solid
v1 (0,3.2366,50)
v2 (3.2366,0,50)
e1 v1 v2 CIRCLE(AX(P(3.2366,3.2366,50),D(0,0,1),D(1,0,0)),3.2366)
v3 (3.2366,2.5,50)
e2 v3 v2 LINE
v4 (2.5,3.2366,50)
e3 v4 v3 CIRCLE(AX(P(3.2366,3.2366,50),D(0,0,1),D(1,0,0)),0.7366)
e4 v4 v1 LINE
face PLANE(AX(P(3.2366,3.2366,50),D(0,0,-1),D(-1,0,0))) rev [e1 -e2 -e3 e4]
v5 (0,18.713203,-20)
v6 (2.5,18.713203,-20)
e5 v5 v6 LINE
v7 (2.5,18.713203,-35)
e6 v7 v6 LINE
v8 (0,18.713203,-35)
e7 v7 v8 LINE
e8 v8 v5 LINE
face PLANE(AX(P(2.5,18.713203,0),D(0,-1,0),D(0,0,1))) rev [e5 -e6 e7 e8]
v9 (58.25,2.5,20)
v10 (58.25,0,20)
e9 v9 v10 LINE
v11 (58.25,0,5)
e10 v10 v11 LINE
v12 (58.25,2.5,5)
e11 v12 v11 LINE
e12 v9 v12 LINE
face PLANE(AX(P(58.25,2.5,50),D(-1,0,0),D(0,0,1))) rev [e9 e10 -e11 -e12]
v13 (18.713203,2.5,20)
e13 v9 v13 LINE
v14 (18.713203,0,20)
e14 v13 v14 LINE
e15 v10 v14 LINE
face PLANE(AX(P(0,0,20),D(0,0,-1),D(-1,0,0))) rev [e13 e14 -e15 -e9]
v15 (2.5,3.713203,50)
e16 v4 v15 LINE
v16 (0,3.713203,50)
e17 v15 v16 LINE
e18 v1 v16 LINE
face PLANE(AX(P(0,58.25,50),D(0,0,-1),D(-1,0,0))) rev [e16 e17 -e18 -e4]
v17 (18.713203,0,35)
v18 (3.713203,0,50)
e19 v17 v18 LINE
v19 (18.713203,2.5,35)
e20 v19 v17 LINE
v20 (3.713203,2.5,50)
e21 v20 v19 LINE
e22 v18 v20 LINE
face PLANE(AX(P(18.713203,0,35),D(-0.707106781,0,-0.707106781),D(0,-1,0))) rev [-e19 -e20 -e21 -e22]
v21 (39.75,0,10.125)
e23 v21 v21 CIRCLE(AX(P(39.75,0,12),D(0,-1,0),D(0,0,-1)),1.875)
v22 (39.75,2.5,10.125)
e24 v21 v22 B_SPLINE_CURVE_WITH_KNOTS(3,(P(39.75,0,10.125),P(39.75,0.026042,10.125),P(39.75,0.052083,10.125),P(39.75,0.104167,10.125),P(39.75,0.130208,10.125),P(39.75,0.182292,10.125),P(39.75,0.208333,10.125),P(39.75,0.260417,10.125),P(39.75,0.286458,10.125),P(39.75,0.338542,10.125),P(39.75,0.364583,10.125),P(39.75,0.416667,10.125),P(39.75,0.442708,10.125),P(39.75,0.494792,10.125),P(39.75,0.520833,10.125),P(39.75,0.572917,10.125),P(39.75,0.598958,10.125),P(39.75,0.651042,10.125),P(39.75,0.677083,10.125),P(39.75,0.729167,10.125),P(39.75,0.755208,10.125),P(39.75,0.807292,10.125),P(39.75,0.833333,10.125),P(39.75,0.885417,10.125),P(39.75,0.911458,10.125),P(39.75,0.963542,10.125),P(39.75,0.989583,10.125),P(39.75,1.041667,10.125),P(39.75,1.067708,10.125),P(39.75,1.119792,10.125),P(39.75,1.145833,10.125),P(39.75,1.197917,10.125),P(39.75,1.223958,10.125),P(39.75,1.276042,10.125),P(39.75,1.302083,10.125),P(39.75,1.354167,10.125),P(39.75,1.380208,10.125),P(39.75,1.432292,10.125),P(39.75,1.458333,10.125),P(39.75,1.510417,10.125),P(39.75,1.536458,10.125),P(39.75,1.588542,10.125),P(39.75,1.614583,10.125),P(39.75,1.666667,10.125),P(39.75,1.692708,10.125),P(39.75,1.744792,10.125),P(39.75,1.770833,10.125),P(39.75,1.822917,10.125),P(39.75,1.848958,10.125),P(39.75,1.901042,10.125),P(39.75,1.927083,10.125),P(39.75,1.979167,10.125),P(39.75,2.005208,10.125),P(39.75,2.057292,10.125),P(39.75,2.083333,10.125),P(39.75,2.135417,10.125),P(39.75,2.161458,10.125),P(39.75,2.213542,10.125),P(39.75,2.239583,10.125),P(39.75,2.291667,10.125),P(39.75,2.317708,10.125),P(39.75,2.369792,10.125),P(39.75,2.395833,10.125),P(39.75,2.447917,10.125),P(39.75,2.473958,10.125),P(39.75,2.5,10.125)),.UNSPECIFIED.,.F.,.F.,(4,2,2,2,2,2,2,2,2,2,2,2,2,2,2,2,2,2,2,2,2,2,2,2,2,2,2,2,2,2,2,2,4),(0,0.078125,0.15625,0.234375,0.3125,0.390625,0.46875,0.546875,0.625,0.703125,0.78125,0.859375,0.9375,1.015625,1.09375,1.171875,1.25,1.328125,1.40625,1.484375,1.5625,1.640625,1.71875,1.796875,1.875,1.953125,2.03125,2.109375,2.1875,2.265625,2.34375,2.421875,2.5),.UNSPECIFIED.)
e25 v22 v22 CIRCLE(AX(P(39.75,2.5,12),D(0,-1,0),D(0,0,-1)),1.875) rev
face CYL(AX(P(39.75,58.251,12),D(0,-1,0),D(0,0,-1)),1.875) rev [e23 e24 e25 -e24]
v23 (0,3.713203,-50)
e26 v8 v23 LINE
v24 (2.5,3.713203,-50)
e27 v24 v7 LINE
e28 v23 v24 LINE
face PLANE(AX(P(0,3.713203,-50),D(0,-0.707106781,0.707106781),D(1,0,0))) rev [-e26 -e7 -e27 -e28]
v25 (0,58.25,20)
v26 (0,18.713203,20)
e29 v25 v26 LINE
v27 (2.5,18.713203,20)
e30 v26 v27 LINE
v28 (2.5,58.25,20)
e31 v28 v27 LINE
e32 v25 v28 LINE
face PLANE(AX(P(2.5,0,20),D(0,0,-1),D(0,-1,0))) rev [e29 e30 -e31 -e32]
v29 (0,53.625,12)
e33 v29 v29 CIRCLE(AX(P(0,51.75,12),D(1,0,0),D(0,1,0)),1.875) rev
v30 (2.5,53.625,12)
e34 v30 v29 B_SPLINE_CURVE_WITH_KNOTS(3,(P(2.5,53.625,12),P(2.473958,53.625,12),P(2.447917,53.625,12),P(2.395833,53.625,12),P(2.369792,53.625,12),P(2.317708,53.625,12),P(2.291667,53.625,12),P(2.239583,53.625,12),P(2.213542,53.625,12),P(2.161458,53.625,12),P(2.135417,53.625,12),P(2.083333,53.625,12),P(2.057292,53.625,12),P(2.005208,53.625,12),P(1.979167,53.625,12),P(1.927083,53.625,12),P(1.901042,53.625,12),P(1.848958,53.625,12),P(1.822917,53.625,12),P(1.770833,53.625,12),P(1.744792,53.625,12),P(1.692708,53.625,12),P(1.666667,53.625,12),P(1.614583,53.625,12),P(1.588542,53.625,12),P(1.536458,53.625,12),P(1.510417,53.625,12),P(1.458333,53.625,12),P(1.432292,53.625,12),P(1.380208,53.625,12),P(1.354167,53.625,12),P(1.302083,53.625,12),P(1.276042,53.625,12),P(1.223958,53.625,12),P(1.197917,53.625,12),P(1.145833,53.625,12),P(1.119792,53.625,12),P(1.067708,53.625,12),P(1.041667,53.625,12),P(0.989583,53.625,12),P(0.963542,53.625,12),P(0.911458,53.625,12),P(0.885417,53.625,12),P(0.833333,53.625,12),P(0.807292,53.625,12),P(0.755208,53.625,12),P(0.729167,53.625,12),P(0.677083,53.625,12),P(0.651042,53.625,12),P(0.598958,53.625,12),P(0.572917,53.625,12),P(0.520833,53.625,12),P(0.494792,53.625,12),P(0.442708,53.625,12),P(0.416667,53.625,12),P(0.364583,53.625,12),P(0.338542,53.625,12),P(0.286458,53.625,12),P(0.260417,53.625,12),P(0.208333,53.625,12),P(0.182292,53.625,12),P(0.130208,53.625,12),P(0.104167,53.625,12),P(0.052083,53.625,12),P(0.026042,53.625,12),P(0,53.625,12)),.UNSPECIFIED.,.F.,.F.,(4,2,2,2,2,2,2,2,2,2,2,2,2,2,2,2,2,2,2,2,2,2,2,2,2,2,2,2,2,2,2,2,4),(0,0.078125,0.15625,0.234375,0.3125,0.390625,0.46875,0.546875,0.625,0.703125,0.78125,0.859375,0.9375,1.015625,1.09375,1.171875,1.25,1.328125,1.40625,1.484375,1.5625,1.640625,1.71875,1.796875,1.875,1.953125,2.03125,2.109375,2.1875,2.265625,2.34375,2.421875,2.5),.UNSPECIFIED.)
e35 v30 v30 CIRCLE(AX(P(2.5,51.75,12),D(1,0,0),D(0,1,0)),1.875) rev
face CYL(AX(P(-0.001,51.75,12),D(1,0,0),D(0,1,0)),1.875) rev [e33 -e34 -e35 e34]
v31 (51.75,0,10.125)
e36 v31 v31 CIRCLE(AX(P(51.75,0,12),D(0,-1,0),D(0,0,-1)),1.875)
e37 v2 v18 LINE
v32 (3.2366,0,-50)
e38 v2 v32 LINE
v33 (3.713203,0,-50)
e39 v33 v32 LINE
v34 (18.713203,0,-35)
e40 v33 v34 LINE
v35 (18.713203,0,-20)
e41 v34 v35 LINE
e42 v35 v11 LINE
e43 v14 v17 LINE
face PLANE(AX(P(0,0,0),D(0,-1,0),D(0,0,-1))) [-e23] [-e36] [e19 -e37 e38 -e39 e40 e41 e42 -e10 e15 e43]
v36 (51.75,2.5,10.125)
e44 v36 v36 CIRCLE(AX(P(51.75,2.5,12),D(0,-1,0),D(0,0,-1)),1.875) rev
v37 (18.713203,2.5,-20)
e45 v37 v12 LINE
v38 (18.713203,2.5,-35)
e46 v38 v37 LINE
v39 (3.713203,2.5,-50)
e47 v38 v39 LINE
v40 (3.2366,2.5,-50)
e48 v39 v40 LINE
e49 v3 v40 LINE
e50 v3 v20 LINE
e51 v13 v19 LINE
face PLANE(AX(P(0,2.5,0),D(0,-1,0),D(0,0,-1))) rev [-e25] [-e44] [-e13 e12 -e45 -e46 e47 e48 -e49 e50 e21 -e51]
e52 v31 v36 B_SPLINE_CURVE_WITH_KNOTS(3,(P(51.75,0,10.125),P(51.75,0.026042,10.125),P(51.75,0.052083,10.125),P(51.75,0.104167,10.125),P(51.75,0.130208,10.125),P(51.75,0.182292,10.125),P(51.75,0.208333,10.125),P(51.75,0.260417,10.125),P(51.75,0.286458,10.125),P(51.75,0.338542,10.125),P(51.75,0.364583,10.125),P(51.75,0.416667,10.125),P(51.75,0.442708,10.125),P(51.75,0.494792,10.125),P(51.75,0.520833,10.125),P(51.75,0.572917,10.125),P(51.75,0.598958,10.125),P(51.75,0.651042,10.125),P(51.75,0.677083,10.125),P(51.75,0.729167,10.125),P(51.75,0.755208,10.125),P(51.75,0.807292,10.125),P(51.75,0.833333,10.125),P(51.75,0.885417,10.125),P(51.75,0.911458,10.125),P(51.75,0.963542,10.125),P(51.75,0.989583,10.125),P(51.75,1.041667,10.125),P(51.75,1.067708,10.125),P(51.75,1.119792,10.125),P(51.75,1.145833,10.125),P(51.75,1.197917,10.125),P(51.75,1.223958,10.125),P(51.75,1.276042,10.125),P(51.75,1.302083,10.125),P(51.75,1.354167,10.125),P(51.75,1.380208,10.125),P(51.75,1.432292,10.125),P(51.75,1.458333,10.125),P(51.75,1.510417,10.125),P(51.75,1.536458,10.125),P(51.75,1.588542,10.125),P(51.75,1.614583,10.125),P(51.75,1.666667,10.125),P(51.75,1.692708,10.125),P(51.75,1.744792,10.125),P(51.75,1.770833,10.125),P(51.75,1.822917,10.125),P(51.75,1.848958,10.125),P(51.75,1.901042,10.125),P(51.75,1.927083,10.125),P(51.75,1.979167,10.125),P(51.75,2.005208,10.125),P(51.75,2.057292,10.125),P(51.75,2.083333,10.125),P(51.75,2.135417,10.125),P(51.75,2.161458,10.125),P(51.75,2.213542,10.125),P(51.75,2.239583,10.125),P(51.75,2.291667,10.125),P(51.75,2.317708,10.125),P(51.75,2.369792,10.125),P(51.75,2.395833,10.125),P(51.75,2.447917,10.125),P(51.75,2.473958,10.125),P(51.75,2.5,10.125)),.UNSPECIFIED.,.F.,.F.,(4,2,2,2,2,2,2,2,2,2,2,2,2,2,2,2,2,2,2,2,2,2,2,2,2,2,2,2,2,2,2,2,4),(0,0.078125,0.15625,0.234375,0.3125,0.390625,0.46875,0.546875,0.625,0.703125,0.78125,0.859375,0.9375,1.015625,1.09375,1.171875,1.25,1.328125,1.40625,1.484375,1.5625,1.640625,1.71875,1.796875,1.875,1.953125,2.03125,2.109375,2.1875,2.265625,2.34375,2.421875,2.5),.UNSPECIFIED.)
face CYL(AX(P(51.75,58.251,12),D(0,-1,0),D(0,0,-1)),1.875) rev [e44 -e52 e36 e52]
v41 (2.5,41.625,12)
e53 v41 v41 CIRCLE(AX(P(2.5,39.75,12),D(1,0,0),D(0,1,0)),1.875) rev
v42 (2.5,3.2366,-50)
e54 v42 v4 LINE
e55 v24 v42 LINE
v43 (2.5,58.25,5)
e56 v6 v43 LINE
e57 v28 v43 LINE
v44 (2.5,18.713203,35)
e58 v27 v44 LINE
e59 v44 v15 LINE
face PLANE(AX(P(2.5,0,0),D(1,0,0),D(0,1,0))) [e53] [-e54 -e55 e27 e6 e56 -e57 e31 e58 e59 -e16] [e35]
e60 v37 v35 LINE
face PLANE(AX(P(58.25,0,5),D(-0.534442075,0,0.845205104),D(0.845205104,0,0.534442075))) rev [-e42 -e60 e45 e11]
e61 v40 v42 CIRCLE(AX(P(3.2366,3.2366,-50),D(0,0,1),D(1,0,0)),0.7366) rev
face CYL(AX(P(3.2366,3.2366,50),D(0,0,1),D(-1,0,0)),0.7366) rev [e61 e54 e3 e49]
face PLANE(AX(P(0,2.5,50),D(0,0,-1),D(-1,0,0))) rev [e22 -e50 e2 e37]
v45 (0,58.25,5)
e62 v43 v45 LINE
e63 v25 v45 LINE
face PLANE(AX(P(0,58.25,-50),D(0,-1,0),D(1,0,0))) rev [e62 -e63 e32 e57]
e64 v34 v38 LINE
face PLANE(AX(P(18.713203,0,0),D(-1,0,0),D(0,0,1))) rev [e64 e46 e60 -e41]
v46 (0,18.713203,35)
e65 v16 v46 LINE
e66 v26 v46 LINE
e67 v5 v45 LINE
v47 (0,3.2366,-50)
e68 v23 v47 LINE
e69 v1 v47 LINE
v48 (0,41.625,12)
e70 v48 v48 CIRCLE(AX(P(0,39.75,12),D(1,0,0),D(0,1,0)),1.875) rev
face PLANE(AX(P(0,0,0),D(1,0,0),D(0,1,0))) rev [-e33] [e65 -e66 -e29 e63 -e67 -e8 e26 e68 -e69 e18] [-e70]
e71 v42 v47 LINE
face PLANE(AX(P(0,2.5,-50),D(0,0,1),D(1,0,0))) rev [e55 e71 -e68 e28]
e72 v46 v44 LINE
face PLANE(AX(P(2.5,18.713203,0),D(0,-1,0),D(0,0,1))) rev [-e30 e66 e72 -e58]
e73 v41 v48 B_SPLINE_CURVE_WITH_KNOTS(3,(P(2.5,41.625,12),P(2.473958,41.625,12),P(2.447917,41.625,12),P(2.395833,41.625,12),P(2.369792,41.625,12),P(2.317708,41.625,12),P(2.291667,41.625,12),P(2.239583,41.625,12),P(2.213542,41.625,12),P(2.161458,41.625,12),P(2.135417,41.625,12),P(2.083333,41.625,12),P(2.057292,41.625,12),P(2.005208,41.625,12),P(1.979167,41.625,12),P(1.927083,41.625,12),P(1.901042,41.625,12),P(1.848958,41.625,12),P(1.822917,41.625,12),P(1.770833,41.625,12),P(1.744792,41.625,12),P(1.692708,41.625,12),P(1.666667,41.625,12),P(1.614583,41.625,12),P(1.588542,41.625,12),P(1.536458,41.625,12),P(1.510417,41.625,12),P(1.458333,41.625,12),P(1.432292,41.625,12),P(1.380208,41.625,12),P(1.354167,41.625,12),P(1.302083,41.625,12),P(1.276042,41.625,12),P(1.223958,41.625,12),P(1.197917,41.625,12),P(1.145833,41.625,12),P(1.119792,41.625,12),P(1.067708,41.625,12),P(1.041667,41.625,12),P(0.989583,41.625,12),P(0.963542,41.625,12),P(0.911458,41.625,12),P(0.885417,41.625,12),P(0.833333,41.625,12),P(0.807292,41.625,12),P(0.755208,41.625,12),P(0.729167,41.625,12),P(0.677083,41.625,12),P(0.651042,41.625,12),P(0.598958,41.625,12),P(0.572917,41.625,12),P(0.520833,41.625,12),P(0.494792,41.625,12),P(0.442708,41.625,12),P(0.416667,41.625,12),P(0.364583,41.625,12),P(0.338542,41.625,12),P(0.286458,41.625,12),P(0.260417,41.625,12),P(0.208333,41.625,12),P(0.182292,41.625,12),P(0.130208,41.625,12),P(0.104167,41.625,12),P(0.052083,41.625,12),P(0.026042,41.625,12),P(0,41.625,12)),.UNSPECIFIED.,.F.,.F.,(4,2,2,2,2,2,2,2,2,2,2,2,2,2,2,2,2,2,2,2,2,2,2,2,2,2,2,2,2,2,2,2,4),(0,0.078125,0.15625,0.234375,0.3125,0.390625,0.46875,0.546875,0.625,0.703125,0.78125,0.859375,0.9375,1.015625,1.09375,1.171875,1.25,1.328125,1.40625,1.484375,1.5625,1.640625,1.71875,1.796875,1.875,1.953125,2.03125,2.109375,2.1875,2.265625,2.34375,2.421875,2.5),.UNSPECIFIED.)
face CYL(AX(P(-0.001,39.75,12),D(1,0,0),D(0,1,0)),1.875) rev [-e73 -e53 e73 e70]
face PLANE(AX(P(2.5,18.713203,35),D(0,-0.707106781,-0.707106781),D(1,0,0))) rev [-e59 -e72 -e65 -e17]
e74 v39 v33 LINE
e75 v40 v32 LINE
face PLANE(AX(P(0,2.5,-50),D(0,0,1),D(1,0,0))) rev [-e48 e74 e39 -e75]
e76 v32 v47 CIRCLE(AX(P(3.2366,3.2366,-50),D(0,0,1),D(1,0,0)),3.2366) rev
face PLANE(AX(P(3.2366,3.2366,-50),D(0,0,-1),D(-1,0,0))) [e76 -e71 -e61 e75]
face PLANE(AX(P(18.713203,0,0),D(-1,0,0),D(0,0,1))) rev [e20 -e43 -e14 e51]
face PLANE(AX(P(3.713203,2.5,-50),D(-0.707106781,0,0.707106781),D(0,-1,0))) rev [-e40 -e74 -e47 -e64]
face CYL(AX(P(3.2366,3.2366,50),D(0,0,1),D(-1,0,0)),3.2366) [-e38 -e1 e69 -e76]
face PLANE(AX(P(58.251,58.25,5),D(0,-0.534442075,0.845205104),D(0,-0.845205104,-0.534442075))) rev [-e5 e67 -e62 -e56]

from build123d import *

# Parameters (mm, degrees)
SKETCH1_W                    = 58.25
SKETCH1_H                    = 100
BASE_FLANGE1_DEPTH           = 2.5
EDGE_FLANGE1_STRIP_W         = 11.4732
EDGE_FLANGE1_STRIP_H         = 2.5
EDGE_FLANGE1_STRIP_CUT_DEPTH = 100
EDGE_FLANGE1_DEPTH           = 100
CUT_EXTRUDE1_START           = -30
CUT_EXTRUDE1_OUTLINE_W       = 2.5
CUT_EXTRUDE1_OUTLINE_H       = 39.536796564
CUT_EXTRUDE1_OUTLINE_W_2     = 39.536796564
CUT_EXTRUDE1_OUTLINE_H_2     = 2.5
CUT_EXTRUDE1_DEPTH           = 30
CUT_EXTRUDE2_REACH           = 98.365
SKETCH21_R                   = 1.875
CIRPATTERN1_COUNT            = 2
CIRPATTERN1_ANGLE            = 90
CUT_EXTRUDE3_REACH           = 98.365
CIRPATTERN2_COUNT            = 2
CIRPATTERN2_ANGLE            = 90
CHAMFER1_SIZE                = 15


# Read off the part's stored shape, not the designer's step: Cut-Extrude1
# Sheet-metal steps are written as plain solids
with BuildPart() as part:
    # Sketch1 → Base-Flange1 (new body)
    with BuildSketch(Plane(origin=(0, 0, 0), x_dir=(1, 0, 0), z_dir=(0, 1, 0))):
        with Locations((29.125, 0)):
            Rectangle(SKETCH1_W, SKETCH1_H)
    extrude(amount=BASE_FLANGE1_DEPTH)

    # Edge-Flange1 strip (across the edge) → Edge-Flange1 strip cut (cut)
    with BuildSketch(Plane(origin=(0, 2.5, -50), x_dir=(1, 0, 0), z_dir=(0, 0, 1))):
        with Locations((-2.5, -1.25)):
            Rectangle(EDGE_FLANGE1_STRIP_W, EDGE_FLANGE1_STRIP_H)
    extrude(amount=EDGE_FLANGE1_STRIP_CUT_DEPTH, mode=Mode.SUBTRACT)

    # Edge-Flange1 section (across the edge) → Edge-Flange1 (add)
    with BuildSketch(Plane(origin=(0, 2.5, -50), x_dir=(1, 0, 0), z_dir=(0, 0, 1))):
        with BuildLine():
            Line((0, 0.7366), (0, 55.75))
            Line((0, 55.75), (2.5, 55.75))
            Line((2.5, 55.75), (2.5, 0.7366))
            ThreePointArc((2.5, 0.7366), (2.715745145, 0.215745145), (3.2366, 0))
            Line((3.2366, 0), (3.2366, -2.5))
            ThreePointArc((3.2366, -2.5), (0.947978192, -1.552021808), (0, 0.7366))
        make_face()
    extrude(amount=EDGE_FLANGE1_DEPTH)

    # Cut-Extrude1 outline → Cut-Extrude1 (cut)
    with BuildSketch(Plane.XY.offset(50).offset(CUT_EXTRUDE1_START)):
        with Locations((1.25, 38.481601718)):
            Rectangle(CUT_EXTRUDE1_OUTLINE_W, CUT_EXTRUDE1_OUTLINE_H)
        with Locations((38.481601718, 1.25)):
            Rectangle(CUT_EXTRUDE1_OUTLINE_W_2, CUT_EXTRUDE1_OUTLINE_H_2)
    cut_extrude1 = extrude(amount=CUT_EXTRUDE1_DEPTH, mode=Mode.SUBTRACT)

    # Sketch21 → Cut-Extrude2 (cut, up to next)
    with BuildSketch(Plane.XZ, mode=Mode.PRIVATE) as cut_extrude2_sk1:
        with Locations(Location((51.75, 12, 0), (0, 0, 270))):
            Circle(SKETCH21_R)
    cut_extrude2_tool1 = extrude(cut_extrude2_sk1.sketch, amount=-CUT_EXTRUDE2_REACH, mode=Mode.PRIVATE) & part.part
    # Sketch21 → Cut-Extrude2 (cut, up to next)
    with BuildSketch(Plane.XZ, mode=Mode.PRIVATE) as cut_extrude2_sk2:
        with Locations(Location((39.75, 12, 0), (0, 0, 270))):
            Circle(SKETCH21_R)
    cut_extrude2_tool2 = extrude(cut_extrude2_sk2.sketch, amount=-CUT_EXTRUDE2_REACH, mode=Mode.PRIVATE) & part.part
    cut_extrude2_1 = cut_extrude2_tool1.solids().sort_by_distance((51.75, 0, 12))[0]
    add(cut_extrude2_1, mode=Mode.SUBTRACT)
    cut_extrude2_2 = cut_extrude2_tool2.solids().sort_by_distance((39.75, 0, 12))[0]
    add(cut_extrude2_2, mode=Mode.SUBTRACT)
    cut_extrude2 = cut_extrude2_1 + cut_extrude2_2  # Cut-Extrude2 as one shape, for the pattern or mirror that repeats it

    # CirPattern1: Cut-Extrude2; each copy of Cut-Extrude2 runs up to whatever stops it at its own place
    cirpattern1_before = part.part  # the part as the pattern finds it: every copy runs up to it
    cirpattern1_cut_extrude2_long1 = extrude(cut_extrude2_sk1.sketch, amount=-CUT_EXTRUDE2_REACH, mode=Mode.PRIVATE)
    cirpattern1_cut_extrude2_long2 = extrude(cut_extrude2_sk2.sketch, amount=-CUT_EXTRUDE2_REACH, mode=Mode.PRIVATE)
    cirpattern1_cut_extrude2_tool1_1 = cirpattern1_cut_extrude2_long1.rotate(Axis((3.2366, 3.2366, 0), (0, 0, 1)), 1 * CIRPATTERN1_ANGLE / (CIRPATTERN1_COUNT - 1)) & cirpattern1_before
    add(cirpattern1_cut_extrude2_tool1_1.solids().sort_by_distance((6.4732, 51.75, 12))[0], mode=Mode.SUBTRACT)
    cirpattern1_cut_extrude2_tool2_1 = cirpattern1_cut_extrude2_long2.rotate(Axis((3.2366, 3.2366, 0), (0, 0, 1)), 1 * CIRPATTERN1_ANGLE / (CIRPATTERN1_COUNT - 1)) & cirpattern1_before
    add(cirpattern1_cut_extrude2_tool2_1.solids().sort_by_distance((6.4732, 39.75, 12))[0], mode=Mode.SUBTRACT)

    # Mirror1: Cut-Extrude1 across plane
    add(cut_extrude1.mirror(Plane.XY), mode=Mode.SUBTRACT)

    # Sketch22 → Cut-Extrude3 (cut, up to next)
    with BuildSketch(Plane.ZY, mode=Mode.PRIVATE) as cut_extrude3_sk1:
        Polygon((-20, 18.713203436), (-20, 58.25), (5, 58.25), align=None)
    cut_extrude3_tool1 = extrude(cut_extrude3_sk1.sketch, amount=-CUT_EXTRUDE3_REACH, mode=Mode.PRIVATE) & part.part
    cut_extrude3 = cut_extrude3_tool1.solids().sort_by_distance((0, 45.071068, -11.666667))[0]
    add(cut_extrude3, mode=Mode.SUBTRACT)

    # CirPattern2: Cut-Extrude3; each copy of Cut-Extrude3 runs up to whatever stops it at its own place
    cirpattern2_before = part.part  # the part as the pattern finds it: every copy runs up to it
    cirpattern2_cut_extrude3_long = extrude(cut_extrude3_sk1.sketch, amount=-CUT_EXTRUDE3_REACH, mode=Mode.PRIVATE)
    cirpattern2_cut_extrude3_tool1 = cirpattern2_cut_extrude3_long.rotate(Axis((3.2366, 3.2366, 0), (0, 0, -1)), 1 * CIRPATTERN2_ANGLE / (CIRPATTERN2_COUNT - 1)) & cirpattern2_before
    add(cirpattern2_cut_extrude3_tool1.solids().sort_by_distance((45.071068, 6.4732, -11.666667))[0], mode=Mode.SUBTRACT)

    # Chamfer1
    chamfer1_edges = [part.edges().sort_by_distance(p)[0] for p in [
        (1.25, 18.713203436, -50),
        (18.713203436, 1.25, -50),
        (1.25, 18.713203436, 50),
        (18.713203436, 1.25, 50),
    ]]
    chamfer(chamfer1_edges, length=CHAMFER1_SIZE)


solid = part.part
